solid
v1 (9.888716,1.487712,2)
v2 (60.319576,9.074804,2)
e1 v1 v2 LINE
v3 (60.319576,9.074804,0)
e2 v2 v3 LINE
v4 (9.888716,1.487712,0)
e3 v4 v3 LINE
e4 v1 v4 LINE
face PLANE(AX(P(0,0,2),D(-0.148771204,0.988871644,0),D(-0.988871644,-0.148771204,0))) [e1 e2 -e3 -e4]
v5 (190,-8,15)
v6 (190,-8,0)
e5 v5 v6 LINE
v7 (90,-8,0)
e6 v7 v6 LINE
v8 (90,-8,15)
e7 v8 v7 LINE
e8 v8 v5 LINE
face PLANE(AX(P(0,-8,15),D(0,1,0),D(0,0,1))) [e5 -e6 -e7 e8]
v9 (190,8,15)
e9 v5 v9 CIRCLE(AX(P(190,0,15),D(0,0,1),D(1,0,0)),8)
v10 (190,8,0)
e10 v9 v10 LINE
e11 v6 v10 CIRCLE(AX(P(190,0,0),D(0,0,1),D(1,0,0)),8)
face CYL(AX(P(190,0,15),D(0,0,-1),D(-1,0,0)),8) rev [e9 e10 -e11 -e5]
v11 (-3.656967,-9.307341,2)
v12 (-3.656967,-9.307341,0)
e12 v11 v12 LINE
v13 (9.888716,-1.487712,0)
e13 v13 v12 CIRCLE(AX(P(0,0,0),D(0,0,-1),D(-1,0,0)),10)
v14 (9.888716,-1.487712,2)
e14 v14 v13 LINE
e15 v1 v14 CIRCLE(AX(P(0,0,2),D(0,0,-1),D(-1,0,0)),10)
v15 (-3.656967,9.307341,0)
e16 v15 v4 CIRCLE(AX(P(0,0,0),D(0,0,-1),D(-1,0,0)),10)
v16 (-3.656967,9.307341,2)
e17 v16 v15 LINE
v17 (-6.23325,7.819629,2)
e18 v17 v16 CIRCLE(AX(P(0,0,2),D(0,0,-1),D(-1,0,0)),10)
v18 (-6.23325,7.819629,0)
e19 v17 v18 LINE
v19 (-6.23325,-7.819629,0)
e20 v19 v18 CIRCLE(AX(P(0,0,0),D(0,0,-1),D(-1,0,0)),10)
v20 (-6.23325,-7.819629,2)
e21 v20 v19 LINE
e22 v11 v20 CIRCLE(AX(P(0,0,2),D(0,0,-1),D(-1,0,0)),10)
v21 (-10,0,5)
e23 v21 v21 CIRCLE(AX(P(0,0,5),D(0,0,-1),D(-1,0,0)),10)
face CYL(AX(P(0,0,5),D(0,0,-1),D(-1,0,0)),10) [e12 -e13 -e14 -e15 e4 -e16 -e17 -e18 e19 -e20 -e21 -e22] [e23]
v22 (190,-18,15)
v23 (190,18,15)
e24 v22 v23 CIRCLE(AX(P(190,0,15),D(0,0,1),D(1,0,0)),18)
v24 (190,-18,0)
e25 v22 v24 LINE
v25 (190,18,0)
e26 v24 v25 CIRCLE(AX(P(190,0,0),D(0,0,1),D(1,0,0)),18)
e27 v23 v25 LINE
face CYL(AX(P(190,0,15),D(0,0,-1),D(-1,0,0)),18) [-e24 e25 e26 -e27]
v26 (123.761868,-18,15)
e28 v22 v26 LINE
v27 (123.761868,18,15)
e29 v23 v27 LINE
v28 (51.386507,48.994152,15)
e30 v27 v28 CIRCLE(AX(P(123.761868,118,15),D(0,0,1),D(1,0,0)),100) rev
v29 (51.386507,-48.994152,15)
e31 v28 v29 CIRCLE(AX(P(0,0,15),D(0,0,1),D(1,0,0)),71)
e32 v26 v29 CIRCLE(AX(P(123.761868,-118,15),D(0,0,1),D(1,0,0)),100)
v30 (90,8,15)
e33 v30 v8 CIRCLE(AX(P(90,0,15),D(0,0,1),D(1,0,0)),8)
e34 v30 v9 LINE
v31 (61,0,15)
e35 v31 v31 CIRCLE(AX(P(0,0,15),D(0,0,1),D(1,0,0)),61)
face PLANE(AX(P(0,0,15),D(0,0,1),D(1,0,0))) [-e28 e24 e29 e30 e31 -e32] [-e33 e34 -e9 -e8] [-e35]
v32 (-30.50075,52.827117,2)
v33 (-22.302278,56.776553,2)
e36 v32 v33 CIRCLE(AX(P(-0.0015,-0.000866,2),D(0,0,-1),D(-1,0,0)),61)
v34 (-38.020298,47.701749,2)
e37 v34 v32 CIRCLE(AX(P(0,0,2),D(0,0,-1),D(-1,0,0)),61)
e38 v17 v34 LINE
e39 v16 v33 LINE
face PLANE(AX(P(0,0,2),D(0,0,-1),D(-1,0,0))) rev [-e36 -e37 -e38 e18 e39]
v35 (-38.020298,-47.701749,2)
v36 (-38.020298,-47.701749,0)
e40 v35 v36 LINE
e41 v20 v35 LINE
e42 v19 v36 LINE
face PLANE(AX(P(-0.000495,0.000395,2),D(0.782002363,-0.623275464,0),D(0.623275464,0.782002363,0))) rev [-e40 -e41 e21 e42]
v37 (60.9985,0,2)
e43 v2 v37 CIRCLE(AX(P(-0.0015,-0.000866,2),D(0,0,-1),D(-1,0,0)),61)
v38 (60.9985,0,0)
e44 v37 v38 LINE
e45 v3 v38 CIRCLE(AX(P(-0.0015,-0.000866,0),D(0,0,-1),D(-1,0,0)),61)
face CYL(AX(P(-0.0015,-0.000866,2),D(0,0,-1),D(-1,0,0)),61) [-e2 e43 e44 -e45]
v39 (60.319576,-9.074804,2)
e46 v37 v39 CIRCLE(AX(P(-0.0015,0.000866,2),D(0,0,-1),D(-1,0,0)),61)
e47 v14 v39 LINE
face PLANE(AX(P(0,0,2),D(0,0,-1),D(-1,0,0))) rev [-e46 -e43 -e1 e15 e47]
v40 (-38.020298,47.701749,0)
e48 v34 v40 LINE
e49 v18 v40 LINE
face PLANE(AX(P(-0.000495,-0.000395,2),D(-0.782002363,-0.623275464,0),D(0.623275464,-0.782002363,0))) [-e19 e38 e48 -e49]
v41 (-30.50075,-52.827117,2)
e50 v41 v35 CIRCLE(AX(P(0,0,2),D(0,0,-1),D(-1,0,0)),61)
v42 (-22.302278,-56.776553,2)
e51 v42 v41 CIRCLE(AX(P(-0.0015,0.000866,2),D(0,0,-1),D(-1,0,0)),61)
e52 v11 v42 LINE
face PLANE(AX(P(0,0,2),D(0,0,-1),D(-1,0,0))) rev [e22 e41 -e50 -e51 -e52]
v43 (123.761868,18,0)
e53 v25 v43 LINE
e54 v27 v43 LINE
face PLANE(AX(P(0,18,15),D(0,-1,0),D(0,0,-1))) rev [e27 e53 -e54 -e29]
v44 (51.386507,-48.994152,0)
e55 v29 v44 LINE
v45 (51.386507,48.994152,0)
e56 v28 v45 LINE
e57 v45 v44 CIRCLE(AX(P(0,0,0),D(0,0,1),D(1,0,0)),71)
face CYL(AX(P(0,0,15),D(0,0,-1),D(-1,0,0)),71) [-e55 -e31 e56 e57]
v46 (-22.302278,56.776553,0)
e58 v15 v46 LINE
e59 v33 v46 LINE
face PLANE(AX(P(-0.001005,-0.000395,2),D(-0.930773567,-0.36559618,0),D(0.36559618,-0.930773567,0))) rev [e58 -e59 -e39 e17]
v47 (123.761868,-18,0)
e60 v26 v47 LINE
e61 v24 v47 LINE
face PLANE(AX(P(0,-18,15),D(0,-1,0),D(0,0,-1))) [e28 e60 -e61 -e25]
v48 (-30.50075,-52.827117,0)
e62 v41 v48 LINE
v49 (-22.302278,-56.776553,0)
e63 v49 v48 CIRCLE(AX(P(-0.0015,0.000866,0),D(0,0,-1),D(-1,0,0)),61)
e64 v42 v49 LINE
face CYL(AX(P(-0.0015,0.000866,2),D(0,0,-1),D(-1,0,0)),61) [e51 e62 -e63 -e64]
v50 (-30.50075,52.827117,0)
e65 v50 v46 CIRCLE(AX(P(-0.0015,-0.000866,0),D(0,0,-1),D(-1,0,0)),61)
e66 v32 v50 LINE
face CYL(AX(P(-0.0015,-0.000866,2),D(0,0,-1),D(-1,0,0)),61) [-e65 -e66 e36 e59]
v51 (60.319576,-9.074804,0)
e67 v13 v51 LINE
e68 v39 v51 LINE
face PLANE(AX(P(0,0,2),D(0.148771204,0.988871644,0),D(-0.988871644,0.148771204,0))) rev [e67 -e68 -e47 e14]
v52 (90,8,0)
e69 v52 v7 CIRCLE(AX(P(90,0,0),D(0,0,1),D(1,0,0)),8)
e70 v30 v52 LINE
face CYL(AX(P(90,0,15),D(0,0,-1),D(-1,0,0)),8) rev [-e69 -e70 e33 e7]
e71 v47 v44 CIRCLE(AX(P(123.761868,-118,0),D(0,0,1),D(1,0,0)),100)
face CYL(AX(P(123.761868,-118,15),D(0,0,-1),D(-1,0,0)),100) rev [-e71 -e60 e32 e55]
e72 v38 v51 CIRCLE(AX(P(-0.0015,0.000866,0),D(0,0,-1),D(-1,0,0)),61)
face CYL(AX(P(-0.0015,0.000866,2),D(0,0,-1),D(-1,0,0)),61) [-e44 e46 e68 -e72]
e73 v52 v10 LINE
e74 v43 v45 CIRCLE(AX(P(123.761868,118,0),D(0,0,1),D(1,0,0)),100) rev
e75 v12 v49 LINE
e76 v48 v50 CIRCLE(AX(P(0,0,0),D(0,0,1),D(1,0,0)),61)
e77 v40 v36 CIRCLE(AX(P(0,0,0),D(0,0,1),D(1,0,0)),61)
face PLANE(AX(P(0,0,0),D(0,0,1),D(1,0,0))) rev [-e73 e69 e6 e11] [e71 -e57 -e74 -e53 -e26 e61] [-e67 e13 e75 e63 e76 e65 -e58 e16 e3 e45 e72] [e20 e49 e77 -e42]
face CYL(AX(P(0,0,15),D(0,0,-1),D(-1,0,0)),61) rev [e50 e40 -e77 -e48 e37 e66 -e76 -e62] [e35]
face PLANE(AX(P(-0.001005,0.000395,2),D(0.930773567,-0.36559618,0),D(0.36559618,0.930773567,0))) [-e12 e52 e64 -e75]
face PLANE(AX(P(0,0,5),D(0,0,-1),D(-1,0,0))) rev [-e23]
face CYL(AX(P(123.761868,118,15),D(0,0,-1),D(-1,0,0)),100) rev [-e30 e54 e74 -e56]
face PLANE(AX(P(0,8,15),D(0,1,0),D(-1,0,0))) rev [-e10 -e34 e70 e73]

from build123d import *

# Parameters (mm, degrees)
BOSS_EXTRUDE1_DEPTH = 15
SKETCH2_R           = 10
BOSS_EXTRUDE2_DEPTH = 5
BOSS_EXTRUDE3_START = -2
BOSS_EXTRUDE3_DEPTH = 2


# Read off the part's stored shape, not the designer's step: Boss-Extrude3
with BuildPart() as part:
    # Sketch1 → Boss-Extrude1 (new body)
    # profile 1 of 3: a face of its own
    with BuildSketch(Plane.XY):
        with BuildLine():
            ThreePointArc((190, -18), (208, 0), (190, 18))
            Line((190, 18), (123.761868118, 18))
            ThreePointArc((123.761868118, 18), (84.395542377, 26.074528026), (51.386506645, 48.994152047))
            ThreePointArc((51.386506645, 48.994152047), (-71, 0), (51.386506645, -48.994152047))
            ThreePointArc((51.386506645, -48.994152047), (84.395542377, -26.074528026), (123.761868118, -18))
            Line((123.761868118, -18), (190, -18))
        make_face()
        with BuildLine():
            ThreePointArc((60.473134531, -8), (-61, 0), (60.473134531, 8))
            Line((60.473134531, 8), (90, 8))
            Line((90, 8), (190, 8))
            ThreePointArc((190, 8), (195.656854249, 5.656854249), (198, 0))
            ThreePointArc((198, 0), (195.656854249, -5.656854249), (190, -8))
            Line((190, -8), (90, -8))
            Line((90, -8), (60.473134531, -8))
        make_face(mode=Mode.SUBTRACT)
    # profile 2 of 3: a face of its own
    with BuildSketch(Plane.XY):
        with BuildLine():
            Line((82, 0), (61, 0))
            ThreePointArc((61, 0), (60.868141118, -4.008665215), (60.473134531, -8))
            Line((60.473134531, -8), (90, -8))
            ThreePointArc((90, -8), (84.343145751, -5.656854249), (82, 0))
        make_face()
    # profile 3 of 3: a face of its own
    with BuildSketch(Plane.XY):
        with BuildLine():
            ThreePointArc((60.473134531, 8), (60.868141118, 4.008665215), (61, 0))
            Line((61, 0), (82, 0))
            ThreePointArc((82, 0), (84.343145751, 5.656854249), (90, 8))
            Line((90, 8), (60.473134531, 8))
        make_face()
    extrude(amount=BOSS_EXTRUDE1_DEPTH)



with BuildPart() as body_2:
    # Sketch2 → Boss-Extrude2 (new body)
    with BuildSketch(Plane(origin=(0, 0, 0), x_dir=(-1, 0, 0), z_dir=(0, 0, -1))):
        Circle(SKETCH2_R)
    extrude(amount=-BOSS_EXTRUDE2_DEPTH)


with BuildPart() as part_1:
    add(part.part)

    add(body_2.part)  # Boss-Extrude3 merges body 2
    # Boss-Extrude3 outline → Boss-Extrude3 (add)
    with BuildSketch(Plane(origin=(0, 0, 0), x_dir=(-1, 0, 0), z_dir=(0, 0, -1)).offset(BOSS_EXTRUDE3_START)):
        with BuildLine():
            ThreePointArc((3.656966593, 9.307340938), (5.000741635, 8.659825812), (6.233249816, 7.819628938))
            Line((6.233249816, 7.819628938), (38.020298491, 47.701749471))
            ThreePointArc((38.020298491, 47.701749471), (34.356234784, 50.404852261), (30.500749997, 52.827116613))
            ThreePointArc((30.500749997, 52.827116613), (26.47526514, 54.954932207), (22.302277601, 56.776553063))
            Line((22.302277601, 56.776553063), (3.656966593, 9.307340938))
        make_face()
        with BuildLine():
            Line((38.020298491, -47.701749471), (6.233249816, -7.819628938))
            ThreePointArc((6.233249816, -7.819628938), (5.000741635, -8.659825812), (3.656966593, -9.307340938))
            Line((3.656966593, -9.307340938), (22.302277601, -56.776553063))
            ThreePointArc((22.302277601, -56.776553063), (26.475265139, -54.954932207), (30.500749997, -52.827116613))
            ThreePointArc((30.500749997, -52.827116613), (34.356234784, -50.404852261), (38.020298491, -47.701749471))
        make_face()
        with BuildLine():
            ThreePointArc((-9.888716443, -1.487712038), (-10, 0), (-9.888716443, 1.487712038))
            Line((-9.888716443, 1.487712038), (-60.319576093, 9.074803592))
            ThreePointArc((-60.319576093, 9.074803592), (-60.828499924, 4.550079946), (-60.998499994, 0))
            ThreePointArc((-60.998499994, 0), (-60.828499924, -4.550079946), (-60.319576093, -9.074803592))
            Line((-60.319576093, -9.074803592), (-9.888716443, -1.487712038))
        make_face()
    extrude(amount=BOSS_EXTRUDE3_DEPTH)


solid = part_1.part
